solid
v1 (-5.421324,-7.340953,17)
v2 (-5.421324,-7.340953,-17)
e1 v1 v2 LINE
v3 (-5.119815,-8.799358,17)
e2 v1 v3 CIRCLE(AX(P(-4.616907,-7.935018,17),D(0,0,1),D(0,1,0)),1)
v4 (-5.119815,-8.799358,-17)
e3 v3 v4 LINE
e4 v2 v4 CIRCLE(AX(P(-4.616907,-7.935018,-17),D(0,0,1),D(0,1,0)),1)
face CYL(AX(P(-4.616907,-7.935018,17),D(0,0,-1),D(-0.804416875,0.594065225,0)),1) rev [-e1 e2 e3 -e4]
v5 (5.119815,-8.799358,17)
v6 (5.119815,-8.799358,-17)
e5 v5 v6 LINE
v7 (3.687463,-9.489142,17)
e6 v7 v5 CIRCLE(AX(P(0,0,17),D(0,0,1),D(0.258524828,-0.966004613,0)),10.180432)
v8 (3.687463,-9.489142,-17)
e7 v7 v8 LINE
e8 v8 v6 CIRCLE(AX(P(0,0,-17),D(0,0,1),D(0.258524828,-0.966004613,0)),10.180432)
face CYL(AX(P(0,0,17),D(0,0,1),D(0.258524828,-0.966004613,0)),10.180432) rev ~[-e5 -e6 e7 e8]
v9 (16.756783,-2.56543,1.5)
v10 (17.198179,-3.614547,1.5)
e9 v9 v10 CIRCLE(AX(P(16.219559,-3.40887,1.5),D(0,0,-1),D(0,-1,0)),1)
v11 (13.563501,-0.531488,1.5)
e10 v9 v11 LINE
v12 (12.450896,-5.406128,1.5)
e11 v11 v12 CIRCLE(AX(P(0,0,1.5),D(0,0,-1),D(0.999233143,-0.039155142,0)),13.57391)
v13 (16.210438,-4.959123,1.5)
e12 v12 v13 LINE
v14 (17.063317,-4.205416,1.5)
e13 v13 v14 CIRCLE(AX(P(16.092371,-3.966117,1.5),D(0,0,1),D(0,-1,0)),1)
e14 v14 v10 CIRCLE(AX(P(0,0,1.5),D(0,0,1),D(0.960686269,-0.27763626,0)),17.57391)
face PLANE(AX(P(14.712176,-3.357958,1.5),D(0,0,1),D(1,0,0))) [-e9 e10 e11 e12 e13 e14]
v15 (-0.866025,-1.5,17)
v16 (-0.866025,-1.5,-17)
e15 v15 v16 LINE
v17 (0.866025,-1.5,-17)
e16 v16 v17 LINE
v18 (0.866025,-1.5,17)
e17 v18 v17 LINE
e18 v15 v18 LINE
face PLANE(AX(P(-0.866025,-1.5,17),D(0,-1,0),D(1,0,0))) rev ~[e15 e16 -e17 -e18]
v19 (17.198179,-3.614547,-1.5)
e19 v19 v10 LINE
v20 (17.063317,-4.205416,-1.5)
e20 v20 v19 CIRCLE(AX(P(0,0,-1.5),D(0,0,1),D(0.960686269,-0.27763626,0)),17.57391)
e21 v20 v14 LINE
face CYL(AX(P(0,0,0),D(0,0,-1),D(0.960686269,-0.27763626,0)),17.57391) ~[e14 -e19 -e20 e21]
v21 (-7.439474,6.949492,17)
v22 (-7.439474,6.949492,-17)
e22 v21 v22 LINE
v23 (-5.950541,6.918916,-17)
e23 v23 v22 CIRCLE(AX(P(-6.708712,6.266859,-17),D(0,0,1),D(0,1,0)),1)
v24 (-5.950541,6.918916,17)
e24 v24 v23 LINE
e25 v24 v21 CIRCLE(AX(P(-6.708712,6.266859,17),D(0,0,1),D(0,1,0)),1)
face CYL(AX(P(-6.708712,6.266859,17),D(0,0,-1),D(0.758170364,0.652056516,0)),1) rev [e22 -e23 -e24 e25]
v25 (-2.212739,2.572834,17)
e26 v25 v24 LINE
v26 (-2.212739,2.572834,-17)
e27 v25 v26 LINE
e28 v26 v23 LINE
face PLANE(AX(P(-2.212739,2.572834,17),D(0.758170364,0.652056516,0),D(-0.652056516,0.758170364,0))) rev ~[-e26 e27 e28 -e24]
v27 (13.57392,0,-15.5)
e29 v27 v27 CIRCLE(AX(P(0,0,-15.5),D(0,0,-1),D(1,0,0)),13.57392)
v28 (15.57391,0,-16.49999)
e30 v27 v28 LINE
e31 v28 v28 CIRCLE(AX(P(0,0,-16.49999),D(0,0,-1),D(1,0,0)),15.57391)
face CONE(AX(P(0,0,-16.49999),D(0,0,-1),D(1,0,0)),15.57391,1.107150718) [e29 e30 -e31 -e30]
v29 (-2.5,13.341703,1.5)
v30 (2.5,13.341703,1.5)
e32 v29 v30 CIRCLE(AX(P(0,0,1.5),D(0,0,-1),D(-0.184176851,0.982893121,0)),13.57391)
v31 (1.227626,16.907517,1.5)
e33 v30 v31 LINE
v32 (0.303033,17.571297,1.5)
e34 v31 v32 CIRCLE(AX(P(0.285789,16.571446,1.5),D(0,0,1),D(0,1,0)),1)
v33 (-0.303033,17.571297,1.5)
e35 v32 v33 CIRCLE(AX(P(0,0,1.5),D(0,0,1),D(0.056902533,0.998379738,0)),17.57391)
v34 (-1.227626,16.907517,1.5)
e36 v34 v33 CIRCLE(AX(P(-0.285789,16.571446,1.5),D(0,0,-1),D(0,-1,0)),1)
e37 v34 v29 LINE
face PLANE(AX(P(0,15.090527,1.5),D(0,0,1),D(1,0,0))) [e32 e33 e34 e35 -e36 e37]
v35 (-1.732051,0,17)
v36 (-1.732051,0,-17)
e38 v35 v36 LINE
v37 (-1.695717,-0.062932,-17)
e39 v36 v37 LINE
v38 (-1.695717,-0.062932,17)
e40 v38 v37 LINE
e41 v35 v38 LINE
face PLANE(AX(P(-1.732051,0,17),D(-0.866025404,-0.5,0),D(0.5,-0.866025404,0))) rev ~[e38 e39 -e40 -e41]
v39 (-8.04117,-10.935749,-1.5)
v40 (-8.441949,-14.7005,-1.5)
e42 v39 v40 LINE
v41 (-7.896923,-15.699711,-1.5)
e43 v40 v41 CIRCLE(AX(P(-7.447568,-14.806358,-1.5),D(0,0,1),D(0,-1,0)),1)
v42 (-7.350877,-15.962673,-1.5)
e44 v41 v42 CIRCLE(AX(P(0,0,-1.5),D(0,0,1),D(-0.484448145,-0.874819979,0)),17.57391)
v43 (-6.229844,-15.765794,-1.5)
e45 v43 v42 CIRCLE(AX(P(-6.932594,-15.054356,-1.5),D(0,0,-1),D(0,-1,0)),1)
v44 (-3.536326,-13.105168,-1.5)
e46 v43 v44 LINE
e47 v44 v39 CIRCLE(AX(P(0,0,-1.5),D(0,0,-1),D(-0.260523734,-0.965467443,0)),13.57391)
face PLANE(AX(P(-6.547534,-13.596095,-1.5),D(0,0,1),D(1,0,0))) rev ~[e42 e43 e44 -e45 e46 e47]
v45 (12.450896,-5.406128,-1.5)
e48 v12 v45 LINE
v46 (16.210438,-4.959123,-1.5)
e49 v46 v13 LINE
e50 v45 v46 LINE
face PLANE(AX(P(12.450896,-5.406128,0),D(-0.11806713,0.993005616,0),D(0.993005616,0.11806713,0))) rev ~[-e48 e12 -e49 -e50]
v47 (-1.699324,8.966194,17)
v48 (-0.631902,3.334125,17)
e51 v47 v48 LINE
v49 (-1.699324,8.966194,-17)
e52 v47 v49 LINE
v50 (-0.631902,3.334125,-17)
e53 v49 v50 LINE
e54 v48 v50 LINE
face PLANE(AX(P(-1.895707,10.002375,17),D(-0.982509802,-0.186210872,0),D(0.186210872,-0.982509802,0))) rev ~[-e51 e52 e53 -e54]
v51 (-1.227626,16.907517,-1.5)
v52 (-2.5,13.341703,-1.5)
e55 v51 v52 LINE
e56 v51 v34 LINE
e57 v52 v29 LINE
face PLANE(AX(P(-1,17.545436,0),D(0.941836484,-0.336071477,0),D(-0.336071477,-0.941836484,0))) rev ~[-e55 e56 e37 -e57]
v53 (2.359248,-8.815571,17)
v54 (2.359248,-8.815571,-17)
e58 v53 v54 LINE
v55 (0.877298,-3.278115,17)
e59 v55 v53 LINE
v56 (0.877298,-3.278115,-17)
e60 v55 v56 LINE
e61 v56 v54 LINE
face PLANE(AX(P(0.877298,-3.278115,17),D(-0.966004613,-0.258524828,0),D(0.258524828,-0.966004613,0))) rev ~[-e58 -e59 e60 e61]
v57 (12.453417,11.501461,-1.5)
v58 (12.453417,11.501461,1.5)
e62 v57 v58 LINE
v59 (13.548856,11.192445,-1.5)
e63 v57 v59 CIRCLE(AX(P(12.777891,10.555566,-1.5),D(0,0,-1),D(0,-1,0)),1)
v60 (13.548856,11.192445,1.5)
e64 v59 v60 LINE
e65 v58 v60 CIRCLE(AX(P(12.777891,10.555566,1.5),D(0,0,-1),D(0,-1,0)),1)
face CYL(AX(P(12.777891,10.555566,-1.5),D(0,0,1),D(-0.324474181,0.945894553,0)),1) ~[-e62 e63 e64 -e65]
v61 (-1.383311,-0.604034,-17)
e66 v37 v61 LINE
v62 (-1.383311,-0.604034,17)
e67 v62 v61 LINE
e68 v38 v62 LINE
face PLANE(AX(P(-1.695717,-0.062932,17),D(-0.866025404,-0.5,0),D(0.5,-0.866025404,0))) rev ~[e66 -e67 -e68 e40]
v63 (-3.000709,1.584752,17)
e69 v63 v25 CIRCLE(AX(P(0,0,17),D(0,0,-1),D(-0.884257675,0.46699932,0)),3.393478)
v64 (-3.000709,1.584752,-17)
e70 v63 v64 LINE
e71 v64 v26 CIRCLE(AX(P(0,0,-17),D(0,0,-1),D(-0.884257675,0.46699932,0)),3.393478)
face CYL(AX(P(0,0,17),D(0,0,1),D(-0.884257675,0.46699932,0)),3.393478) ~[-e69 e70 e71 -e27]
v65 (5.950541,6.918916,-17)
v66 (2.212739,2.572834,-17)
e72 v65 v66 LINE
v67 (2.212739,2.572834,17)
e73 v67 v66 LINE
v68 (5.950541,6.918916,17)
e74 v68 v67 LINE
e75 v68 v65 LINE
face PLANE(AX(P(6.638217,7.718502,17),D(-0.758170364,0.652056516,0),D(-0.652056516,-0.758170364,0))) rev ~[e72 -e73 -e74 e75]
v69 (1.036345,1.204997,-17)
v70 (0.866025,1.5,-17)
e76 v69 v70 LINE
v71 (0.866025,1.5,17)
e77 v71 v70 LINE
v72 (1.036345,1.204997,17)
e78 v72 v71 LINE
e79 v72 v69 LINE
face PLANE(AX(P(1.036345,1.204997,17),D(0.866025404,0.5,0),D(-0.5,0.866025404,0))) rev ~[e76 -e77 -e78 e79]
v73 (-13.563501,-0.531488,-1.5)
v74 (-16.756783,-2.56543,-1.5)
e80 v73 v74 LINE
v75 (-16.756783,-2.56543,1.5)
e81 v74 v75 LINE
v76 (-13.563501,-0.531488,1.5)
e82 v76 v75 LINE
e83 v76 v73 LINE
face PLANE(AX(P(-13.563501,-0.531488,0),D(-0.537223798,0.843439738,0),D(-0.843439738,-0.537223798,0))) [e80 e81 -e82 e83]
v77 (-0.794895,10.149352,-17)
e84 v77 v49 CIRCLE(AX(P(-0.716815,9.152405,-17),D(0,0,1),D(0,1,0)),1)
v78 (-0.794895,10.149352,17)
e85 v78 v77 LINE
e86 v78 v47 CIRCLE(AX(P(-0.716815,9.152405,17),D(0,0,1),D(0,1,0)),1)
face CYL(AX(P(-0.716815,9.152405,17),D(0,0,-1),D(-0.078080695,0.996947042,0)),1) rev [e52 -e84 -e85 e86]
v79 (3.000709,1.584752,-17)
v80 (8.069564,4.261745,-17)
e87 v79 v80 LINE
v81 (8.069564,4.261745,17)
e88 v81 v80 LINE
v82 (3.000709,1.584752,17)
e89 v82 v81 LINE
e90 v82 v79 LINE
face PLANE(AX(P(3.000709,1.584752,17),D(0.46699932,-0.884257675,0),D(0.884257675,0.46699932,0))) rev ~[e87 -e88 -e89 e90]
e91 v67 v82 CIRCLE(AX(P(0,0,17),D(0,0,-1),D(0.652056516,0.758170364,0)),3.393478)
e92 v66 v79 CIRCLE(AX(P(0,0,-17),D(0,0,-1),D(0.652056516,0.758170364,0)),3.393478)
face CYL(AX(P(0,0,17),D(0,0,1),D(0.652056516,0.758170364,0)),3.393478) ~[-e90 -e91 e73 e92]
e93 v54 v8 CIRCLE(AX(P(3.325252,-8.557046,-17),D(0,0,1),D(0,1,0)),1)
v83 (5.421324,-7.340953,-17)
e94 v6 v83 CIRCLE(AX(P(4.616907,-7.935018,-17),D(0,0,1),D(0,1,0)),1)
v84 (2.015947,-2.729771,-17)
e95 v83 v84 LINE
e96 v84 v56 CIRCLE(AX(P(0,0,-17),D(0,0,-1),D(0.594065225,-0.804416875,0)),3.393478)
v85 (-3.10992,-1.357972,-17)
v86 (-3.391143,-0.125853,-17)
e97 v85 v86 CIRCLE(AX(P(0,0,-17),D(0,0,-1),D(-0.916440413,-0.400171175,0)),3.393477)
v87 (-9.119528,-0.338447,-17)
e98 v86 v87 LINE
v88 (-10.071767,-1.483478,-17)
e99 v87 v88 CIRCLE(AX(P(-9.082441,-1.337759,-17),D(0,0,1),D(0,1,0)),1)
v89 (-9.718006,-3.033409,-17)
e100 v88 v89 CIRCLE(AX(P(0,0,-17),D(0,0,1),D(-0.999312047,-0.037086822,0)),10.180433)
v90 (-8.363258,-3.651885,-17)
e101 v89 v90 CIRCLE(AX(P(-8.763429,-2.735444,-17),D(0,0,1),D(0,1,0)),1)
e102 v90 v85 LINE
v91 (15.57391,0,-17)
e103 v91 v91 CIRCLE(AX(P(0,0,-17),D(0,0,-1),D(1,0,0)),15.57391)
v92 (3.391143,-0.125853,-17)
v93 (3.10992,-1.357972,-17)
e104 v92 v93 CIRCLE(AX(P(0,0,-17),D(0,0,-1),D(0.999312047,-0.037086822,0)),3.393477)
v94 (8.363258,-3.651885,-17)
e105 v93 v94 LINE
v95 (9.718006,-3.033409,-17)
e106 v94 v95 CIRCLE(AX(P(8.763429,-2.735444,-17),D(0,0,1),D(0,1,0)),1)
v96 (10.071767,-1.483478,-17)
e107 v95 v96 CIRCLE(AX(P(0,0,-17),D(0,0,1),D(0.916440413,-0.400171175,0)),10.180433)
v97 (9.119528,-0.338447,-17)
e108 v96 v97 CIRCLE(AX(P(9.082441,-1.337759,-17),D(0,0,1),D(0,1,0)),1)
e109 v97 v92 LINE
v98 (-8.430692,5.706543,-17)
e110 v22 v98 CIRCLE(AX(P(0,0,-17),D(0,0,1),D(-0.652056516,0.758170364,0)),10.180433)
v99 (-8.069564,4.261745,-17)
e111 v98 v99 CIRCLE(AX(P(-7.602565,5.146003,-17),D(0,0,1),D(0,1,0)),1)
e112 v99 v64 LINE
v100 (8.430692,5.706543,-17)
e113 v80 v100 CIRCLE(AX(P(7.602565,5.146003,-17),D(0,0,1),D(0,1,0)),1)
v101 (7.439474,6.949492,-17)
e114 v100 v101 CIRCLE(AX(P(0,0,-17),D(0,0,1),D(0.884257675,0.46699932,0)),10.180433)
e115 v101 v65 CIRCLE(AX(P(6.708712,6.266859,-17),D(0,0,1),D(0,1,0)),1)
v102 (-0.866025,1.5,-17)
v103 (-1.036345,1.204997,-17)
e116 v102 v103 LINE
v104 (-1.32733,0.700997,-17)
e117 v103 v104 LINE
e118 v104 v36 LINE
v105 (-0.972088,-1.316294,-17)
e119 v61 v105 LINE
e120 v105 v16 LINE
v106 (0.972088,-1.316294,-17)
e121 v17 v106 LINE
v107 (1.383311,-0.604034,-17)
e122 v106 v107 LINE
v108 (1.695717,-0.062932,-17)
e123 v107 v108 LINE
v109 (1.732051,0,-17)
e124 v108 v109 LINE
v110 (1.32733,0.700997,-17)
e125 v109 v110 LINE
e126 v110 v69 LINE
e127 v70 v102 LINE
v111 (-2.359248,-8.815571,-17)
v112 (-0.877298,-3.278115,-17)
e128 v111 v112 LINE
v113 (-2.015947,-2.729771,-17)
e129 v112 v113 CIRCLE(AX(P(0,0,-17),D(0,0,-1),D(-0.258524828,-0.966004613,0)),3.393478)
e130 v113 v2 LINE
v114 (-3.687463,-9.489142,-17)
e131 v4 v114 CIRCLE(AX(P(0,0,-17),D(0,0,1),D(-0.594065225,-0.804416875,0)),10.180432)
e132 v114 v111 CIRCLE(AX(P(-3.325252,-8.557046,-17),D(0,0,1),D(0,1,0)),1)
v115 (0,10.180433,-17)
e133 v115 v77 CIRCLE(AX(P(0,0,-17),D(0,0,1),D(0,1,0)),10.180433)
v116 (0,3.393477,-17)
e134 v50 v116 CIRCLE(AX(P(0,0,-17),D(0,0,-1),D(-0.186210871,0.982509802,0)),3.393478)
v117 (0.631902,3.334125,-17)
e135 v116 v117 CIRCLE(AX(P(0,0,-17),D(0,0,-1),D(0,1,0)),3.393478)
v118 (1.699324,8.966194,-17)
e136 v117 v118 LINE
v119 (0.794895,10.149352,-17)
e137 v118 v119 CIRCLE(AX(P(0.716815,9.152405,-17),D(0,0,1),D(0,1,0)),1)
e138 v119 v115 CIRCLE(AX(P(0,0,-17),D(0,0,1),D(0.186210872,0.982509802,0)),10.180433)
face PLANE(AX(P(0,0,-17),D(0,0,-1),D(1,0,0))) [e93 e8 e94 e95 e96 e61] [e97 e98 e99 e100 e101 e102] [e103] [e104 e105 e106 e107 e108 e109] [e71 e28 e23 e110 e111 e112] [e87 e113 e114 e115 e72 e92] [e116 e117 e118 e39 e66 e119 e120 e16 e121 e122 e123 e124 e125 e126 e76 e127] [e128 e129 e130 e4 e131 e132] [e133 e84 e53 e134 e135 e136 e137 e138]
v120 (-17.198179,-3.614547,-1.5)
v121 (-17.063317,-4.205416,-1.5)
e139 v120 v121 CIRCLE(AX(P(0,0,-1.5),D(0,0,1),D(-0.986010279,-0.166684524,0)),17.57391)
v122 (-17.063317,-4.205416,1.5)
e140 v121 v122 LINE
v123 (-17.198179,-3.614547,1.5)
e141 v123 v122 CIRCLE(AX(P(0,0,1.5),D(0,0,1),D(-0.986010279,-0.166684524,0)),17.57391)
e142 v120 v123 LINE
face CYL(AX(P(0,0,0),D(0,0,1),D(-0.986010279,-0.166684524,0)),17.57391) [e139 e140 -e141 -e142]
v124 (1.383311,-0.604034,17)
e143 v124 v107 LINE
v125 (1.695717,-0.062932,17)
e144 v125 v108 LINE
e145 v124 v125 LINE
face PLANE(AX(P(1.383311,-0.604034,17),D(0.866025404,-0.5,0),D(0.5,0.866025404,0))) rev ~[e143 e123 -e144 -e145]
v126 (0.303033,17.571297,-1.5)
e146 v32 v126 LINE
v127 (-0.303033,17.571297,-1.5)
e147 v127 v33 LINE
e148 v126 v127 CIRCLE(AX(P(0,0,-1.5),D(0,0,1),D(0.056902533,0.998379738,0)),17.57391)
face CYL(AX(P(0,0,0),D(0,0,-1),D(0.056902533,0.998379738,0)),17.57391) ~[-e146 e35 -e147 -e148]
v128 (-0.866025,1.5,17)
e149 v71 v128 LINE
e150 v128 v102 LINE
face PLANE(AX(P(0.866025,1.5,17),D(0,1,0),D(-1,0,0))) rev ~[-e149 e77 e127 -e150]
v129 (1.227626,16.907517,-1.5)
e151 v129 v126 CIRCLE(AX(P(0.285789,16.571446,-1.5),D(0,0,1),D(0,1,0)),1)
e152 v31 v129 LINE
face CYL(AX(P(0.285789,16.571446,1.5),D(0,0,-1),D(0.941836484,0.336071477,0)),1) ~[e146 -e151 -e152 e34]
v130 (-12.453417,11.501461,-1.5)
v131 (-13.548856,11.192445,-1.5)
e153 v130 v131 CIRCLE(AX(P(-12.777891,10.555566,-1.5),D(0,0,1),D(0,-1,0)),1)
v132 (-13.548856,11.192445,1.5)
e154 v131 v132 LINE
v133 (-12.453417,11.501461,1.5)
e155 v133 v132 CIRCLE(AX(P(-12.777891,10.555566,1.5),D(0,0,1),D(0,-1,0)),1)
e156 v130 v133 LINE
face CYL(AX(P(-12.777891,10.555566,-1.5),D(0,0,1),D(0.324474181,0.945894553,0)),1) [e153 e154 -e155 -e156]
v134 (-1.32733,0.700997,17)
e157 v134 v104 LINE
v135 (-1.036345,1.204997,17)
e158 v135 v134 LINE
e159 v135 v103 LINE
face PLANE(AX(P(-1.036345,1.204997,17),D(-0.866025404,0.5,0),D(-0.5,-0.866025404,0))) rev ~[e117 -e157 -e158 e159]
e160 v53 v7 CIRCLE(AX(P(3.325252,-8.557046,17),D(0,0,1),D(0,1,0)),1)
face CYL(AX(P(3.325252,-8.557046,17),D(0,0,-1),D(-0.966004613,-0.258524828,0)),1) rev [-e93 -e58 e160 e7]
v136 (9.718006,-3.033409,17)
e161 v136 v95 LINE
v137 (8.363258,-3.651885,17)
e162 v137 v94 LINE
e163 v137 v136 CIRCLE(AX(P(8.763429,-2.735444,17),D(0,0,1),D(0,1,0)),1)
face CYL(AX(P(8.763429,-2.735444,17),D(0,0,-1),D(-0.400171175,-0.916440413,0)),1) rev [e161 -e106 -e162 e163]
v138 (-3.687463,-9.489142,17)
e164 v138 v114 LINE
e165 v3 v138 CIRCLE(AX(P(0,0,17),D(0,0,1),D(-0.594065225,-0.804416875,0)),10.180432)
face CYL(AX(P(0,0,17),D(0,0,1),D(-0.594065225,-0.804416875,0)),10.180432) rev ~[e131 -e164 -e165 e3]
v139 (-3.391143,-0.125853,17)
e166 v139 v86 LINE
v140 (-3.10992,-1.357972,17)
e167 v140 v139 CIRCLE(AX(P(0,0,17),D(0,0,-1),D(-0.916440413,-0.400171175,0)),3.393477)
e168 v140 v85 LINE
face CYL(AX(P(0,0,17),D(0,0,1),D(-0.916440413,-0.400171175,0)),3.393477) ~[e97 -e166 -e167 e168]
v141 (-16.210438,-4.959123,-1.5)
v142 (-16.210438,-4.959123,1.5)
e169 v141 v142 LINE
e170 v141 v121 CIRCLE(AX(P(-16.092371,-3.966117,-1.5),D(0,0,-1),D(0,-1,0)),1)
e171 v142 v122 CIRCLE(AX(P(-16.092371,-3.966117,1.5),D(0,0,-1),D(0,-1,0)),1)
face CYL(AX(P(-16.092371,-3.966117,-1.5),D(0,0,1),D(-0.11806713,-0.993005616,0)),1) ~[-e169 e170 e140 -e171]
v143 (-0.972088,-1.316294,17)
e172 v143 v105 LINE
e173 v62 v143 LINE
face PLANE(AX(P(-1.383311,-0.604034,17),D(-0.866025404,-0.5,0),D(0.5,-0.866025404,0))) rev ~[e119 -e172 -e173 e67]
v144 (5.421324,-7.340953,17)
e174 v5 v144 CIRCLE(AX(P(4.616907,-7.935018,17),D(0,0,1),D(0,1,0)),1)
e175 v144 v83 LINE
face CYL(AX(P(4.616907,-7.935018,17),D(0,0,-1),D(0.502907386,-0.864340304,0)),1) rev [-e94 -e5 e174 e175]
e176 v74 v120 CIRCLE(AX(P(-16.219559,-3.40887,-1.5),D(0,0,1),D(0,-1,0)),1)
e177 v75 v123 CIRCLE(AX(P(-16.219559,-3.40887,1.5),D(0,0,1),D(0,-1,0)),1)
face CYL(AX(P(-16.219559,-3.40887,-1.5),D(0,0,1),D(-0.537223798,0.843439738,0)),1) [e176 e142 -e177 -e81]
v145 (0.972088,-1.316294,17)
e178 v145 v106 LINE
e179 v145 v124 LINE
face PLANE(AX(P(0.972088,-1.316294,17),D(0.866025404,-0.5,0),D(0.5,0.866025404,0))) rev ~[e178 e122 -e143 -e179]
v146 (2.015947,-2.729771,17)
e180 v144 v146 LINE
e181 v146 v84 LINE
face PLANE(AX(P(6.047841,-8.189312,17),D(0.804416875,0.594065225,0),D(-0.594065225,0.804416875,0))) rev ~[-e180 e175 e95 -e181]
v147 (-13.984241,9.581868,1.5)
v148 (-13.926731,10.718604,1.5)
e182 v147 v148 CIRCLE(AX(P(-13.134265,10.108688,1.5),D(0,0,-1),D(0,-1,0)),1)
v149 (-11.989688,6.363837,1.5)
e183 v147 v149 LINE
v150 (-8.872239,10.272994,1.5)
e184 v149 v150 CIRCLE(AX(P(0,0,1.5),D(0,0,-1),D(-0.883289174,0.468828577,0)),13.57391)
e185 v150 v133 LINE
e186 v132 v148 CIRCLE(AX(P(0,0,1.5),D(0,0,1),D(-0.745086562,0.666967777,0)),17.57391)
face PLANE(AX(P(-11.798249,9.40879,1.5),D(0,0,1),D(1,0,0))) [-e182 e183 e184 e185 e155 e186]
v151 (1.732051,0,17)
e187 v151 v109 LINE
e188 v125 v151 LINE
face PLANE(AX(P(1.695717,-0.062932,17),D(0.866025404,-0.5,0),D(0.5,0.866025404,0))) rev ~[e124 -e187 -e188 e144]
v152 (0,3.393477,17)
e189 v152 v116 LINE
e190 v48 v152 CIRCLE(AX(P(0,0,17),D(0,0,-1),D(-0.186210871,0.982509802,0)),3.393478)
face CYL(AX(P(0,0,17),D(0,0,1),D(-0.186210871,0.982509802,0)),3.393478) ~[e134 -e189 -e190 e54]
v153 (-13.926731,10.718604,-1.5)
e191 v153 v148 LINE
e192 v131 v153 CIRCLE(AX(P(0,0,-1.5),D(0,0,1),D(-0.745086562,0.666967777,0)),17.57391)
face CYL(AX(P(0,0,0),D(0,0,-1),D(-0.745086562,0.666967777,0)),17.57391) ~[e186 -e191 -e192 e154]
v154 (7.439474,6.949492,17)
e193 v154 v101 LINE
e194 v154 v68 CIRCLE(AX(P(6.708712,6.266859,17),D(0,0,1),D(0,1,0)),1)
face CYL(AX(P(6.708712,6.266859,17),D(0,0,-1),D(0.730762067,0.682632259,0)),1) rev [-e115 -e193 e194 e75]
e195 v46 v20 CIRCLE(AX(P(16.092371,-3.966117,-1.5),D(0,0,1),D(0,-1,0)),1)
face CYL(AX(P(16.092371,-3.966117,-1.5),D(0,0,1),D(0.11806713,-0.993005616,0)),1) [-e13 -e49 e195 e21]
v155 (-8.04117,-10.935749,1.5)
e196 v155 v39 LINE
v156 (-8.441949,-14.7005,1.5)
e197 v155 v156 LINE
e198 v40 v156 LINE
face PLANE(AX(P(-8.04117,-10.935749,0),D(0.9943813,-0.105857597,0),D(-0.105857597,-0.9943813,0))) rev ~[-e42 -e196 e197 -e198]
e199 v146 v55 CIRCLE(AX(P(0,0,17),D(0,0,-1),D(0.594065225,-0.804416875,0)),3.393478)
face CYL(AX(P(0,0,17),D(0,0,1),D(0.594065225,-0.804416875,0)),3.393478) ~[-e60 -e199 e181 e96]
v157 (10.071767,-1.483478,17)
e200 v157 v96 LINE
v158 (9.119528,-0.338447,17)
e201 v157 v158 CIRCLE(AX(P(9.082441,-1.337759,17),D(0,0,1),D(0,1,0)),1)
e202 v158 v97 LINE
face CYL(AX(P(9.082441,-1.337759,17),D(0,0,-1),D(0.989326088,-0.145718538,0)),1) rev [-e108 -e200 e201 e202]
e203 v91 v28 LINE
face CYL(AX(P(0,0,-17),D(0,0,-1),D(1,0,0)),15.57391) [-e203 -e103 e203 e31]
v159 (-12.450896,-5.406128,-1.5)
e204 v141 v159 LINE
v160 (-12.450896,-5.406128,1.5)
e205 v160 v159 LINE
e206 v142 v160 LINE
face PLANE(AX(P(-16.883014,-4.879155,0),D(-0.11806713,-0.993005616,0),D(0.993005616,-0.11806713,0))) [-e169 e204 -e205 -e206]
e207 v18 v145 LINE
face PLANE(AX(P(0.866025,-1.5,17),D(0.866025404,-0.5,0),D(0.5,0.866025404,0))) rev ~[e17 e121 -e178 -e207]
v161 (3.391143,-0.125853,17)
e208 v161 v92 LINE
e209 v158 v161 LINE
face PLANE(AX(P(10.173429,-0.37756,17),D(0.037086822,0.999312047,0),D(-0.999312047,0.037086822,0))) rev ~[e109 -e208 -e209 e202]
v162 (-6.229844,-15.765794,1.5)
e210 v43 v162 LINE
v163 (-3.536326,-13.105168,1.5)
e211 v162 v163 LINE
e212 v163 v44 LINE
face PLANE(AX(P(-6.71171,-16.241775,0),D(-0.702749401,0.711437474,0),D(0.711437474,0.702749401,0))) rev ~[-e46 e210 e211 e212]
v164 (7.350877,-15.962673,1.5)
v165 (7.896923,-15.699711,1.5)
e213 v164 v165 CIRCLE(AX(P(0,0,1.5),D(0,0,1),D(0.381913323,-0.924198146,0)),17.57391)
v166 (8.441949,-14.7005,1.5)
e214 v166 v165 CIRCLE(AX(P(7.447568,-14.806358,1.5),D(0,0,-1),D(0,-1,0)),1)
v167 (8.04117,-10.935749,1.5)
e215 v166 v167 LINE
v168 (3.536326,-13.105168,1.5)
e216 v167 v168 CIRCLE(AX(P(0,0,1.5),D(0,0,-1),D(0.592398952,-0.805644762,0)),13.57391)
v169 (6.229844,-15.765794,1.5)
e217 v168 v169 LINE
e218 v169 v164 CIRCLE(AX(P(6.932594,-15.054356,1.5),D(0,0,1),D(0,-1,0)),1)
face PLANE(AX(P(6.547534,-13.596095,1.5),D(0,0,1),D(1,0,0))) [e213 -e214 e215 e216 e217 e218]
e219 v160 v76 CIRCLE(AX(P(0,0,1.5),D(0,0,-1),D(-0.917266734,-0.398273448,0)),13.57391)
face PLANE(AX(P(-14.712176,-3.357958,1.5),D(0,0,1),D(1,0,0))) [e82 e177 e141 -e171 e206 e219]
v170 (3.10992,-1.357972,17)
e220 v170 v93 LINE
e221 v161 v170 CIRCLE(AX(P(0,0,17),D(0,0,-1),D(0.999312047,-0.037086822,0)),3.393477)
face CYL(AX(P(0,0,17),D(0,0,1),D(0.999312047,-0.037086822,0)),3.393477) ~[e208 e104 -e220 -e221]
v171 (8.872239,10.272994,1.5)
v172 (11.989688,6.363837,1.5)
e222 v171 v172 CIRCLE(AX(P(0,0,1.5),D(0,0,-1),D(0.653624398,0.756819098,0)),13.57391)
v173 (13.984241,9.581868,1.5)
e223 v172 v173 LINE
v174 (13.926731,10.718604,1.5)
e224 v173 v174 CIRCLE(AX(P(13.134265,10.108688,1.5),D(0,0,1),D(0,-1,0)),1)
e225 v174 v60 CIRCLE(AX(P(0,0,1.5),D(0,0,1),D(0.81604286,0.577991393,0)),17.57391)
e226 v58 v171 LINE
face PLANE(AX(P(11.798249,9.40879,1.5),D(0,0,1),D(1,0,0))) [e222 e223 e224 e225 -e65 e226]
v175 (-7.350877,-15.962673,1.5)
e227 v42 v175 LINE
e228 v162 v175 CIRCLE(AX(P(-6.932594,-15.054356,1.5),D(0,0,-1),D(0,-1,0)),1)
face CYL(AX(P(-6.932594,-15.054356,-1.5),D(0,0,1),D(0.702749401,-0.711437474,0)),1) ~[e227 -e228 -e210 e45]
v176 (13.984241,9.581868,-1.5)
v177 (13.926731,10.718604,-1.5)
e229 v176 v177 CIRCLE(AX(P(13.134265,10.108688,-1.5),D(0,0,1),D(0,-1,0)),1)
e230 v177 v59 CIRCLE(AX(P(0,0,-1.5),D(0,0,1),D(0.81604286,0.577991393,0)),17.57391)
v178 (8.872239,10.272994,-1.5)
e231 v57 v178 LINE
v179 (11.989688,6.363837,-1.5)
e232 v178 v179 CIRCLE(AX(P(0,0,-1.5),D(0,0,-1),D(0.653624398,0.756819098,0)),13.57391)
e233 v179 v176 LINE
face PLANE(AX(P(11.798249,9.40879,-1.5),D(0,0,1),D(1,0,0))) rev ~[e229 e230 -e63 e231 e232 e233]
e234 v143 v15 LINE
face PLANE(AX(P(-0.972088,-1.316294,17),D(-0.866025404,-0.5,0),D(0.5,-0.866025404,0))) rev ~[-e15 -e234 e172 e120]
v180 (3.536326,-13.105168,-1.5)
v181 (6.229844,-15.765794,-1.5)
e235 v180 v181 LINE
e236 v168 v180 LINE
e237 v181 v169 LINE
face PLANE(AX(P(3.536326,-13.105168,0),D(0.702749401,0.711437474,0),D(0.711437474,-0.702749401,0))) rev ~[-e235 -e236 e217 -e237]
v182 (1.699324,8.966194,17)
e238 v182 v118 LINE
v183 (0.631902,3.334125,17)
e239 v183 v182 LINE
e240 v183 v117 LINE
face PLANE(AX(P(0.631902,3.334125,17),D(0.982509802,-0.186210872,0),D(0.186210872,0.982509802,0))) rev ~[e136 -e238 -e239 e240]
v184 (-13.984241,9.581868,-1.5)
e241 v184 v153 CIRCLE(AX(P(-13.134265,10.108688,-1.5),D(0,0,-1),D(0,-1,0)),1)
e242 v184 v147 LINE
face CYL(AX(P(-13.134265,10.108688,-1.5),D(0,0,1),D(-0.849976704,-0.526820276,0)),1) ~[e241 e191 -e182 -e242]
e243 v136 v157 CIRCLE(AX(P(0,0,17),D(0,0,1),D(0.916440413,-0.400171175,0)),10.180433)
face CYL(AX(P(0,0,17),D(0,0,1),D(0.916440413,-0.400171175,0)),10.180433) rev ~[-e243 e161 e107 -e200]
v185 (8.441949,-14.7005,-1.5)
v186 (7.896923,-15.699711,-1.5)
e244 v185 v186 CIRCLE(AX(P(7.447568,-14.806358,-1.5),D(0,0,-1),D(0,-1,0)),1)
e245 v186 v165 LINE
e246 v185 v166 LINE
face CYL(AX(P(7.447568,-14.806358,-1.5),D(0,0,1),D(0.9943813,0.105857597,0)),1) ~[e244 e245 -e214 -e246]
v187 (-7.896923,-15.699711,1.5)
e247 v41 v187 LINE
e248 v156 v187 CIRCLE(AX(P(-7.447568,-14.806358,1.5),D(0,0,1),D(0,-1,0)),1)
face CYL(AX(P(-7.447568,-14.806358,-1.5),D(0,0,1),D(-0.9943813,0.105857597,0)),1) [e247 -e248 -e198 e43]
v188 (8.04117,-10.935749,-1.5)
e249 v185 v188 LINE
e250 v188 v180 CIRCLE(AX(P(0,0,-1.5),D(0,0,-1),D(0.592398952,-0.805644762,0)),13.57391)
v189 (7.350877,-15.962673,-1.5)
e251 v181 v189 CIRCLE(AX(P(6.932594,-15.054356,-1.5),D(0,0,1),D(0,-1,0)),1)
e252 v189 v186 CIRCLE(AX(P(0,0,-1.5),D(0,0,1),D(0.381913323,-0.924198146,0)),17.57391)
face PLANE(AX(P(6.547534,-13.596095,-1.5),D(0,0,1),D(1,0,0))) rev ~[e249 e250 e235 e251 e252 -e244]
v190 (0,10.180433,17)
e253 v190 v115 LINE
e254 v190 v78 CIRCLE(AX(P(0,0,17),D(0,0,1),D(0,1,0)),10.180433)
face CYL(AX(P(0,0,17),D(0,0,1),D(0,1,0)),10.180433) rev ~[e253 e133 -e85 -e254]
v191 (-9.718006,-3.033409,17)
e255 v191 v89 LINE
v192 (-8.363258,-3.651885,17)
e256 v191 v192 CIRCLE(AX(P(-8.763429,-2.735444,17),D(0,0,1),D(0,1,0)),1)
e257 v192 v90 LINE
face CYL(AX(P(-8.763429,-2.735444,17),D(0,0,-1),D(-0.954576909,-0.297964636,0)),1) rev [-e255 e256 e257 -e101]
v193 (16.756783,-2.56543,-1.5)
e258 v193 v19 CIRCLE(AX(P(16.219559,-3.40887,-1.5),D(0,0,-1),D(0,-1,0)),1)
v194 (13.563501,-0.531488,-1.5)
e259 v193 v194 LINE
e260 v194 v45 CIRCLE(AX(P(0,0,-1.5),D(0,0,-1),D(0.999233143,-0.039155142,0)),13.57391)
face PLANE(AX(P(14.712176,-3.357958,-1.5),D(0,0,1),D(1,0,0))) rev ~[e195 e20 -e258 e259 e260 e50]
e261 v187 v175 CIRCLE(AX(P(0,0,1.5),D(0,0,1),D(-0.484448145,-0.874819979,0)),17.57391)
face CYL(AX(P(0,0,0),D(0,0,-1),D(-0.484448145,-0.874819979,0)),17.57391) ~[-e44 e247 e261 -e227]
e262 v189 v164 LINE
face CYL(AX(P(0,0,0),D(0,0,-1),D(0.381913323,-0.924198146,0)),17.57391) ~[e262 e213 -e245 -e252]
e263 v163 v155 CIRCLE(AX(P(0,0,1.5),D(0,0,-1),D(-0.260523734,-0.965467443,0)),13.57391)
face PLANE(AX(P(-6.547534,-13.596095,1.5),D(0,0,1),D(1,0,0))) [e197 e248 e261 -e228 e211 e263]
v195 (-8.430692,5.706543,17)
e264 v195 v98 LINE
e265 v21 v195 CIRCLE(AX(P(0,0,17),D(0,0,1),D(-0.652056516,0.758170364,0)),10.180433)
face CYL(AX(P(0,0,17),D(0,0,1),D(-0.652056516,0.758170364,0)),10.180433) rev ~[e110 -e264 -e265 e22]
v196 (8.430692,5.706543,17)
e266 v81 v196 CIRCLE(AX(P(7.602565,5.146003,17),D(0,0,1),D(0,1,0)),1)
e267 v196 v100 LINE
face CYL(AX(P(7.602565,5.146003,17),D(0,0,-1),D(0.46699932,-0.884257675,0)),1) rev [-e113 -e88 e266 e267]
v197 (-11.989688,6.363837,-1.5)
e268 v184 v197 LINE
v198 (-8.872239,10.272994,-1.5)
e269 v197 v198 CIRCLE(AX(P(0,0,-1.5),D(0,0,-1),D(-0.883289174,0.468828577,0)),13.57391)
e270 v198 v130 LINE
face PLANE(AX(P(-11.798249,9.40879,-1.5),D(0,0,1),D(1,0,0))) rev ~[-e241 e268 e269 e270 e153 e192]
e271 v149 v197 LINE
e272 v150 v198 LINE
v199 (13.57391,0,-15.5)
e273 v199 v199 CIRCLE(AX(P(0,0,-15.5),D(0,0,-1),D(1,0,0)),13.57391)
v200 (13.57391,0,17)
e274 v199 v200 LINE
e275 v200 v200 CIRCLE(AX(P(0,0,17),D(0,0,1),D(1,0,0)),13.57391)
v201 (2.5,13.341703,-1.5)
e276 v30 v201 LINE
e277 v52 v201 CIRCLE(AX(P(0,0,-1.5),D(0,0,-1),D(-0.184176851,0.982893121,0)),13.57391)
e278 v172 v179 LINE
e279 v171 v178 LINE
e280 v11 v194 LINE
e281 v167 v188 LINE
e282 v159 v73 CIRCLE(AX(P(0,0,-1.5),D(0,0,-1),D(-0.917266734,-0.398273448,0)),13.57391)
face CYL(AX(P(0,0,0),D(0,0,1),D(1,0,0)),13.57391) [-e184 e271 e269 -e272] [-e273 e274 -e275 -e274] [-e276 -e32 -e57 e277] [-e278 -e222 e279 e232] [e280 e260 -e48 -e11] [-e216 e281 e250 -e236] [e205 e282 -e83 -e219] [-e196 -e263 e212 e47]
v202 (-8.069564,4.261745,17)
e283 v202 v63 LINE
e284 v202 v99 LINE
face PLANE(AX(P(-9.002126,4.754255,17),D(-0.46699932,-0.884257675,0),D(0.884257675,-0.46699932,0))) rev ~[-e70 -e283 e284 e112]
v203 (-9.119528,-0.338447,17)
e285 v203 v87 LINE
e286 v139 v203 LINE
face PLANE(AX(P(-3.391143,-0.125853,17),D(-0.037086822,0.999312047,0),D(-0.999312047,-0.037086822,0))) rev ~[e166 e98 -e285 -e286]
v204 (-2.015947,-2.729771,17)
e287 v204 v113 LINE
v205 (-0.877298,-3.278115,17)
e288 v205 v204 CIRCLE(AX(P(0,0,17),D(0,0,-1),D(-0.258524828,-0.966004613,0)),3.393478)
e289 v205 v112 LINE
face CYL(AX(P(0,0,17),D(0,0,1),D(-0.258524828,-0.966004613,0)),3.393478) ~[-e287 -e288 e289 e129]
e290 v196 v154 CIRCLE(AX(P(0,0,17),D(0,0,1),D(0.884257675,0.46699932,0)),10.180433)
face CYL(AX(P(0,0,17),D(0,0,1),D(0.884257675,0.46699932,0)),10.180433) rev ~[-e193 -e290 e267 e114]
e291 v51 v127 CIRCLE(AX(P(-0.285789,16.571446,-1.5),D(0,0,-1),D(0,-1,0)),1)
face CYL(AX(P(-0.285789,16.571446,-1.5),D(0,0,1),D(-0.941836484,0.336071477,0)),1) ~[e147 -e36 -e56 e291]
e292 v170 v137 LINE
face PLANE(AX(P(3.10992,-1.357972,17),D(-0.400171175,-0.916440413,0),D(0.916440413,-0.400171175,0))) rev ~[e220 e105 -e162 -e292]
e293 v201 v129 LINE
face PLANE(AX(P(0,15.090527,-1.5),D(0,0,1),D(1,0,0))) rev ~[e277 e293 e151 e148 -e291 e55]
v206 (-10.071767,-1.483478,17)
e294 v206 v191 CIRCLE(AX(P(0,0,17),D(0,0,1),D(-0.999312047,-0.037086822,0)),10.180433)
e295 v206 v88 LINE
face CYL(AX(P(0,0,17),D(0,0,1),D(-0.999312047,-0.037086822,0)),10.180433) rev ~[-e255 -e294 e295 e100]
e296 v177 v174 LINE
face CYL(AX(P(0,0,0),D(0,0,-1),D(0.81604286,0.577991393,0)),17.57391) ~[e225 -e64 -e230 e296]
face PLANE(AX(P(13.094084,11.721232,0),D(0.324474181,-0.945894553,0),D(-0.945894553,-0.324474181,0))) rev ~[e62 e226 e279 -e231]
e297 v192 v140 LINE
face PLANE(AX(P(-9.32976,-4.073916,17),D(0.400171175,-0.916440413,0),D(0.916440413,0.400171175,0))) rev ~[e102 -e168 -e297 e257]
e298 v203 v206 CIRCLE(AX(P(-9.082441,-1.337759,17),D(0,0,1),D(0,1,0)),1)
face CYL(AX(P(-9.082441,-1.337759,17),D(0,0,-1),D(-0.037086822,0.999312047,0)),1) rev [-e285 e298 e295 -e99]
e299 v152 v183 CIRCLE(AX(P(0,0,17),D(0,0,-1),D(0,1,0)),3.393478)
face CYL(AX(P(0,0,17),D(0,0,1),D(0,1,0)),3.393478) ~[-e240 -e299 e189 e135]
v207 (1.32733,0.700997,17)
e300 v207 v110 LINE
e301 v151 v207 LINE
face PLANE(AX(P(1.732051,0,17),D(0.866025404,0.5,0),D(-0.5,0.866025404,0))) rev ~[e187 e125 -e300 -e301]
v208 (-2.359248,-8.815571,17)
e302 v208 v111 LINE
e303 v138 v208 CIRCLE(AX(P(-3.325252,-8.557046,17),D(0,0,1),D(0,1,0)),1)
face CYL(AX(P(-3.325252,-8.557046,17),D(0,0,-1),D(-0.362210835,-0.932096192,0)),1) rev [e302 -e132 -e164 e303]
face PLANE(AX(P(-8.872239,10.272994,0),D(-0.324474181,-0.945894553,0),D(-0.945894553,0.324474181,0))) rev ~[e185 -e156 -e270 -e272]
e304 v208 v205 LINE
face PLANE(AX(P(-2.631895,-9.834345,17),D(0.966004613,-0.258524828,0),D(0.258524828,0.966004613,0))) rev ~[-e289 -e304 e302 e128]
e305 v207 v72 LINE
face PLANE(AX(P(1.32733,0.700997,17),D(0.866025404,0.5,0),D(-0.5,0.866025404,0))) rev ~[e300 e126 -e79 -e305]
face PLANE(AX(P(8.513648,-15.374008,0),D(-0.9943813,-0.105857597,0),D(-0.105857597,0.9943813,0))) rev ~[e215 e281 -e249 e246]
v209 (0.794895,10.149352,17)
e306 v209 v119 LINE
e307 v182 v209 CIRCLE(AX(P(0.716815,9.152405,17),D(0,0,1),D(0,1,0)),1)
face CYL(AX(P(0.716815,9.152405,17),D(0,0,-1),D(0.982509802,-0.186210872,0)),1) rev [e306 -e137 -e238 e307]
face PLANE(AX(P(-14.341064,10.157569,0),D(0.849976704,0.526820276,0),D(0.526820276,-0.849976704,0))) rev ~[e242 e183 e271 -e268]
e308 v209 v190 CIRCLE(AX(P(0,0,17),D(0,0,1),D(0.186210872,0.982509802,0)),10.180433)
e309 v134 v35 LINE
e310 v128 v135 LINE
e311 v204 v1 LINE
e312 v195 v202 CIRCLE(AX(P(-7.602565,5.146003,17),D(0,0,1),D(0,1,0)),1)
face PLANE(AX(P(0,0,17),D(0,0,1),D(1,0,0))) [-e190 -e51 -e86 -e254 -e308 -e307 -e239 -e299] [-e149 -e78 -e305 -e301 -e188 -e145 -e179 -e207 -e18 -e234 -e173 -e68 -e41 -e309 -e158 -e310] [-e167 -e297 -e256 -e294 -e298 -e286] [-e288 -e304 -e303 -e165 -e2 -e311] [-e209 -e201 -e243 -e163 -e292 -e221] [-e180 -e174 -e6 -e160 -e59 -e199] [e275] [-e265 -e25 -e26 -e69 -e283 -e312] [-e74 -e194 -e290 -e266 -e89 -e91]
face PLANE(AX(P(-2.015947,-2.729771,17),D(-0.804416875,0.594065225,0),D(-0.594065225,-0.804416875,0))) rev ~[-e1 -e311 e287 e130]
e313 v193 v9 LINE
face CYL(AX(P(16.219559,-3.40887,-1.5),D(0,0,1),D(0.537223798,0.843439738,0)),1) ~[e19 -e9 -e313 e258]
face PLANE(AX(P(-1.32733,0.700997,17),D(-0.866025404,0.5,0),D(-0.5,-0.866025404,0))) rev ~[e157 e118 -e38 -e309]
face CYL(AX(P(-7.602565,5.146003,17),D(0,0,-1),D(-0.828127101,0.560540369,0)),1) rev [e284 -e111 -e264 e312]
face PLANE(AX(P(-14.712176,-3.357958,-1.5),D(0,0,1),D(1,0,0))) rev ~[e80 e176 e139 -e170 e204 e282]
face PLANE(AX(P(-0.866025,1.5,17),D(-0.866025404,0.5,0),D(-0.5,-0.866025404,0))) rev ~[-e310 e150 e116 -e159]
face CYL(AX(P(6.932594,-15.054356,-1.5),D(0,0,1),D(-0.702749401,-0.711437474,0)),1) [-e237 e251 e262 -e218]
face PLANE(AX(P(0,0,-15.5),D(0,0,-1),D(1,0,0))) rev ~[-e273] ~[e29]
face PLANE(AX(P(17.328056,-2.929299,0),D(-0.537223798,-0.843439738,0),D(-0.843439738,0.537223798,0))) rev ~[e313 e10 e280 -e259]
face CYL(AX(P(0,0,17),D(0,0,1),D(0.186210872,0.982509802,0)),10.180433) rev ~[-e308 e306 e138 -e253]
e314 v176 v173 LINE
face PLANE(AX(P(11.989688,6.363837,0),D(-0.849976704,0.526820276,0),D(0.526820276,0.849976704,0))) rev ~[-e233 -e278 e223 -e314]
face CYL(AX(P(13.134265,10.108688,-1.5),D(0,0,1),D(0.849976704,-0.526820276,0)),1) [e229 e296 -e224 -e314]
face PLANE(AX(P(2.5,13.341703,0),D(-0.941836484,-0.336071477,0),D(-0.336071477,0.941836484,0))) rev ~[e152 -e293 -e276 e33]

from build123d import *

# Parameters (mm, degrees)
F0_R     = 13.57391
F1_DEPTH = 17
F3_DEPTH = 1.5
F5_DEPTH = 34
F6_R     = 1
F7_R     = 15.57391
F7_R_2   = 13.57391
F8_DEPTH = 1.5
F9_SIZE2 = 0.99999
F9_SIZE  = 1.99999
F10_R    = 1


# Not quite as in the source:
# - a fillet or chamfer is up to 0.001 mm smaller than in the source, because OpenCascade refuses the exact size
# - a feature names something its author has since deleted; it is built from what else it names


with BuildPart() as f1:
    # F0 (on Top) → F1 (new body, symmetric)
    with BuildSketch(Plane.XY):
        Circle(F0_R)
    extrude(amount=F1_DEPTH, both=True)

    # F2 (on Top) → F3 (join, symmetric)
    with BuildSketch(Plane.XY):
        with BuildLine():
            Line((-8.8722387473, 10.27299432), (-13.094084175, 11.721231689))
            ThreePointArc((-13.094084175, 11.721231689), (-13.7398361081, 10.9571536638), (-14.3410637787, 10.1575687241))
            Line((-14.3410637787, 10.1575687241), (-11.9896877566, 6.3638369077))
            ThreePointArc((-11.9896877566, 6.3638369077), (-10.6125101782, 8.4631944563), (-8.8722387473, 10.27299432))
        make_face()
        with BuildLine():
            ThreePointArc((1, 17.5454356654), (0, 17.57391), (-1, 17.5454356654))
            Line((-1, 17.5454356654), (-2.5, 13.3417027657))
            ThreePointArc((-2.5, 13.3417027657), (0, 13.57391), (2.5, 13.3417027657))
            Line((2.5, 13.3417027657), (1, 17.5454356654))
        make_face()
        with BuildLine():
            Line((11.9896877566, 6.3638369077), (14.3410637787, 10.1575687241))
            ThreePointArc((14.3410637787, 10.1575687241), (13.7398361081, 10.9571536638), (13.094084175, 11.721231689))
            Line((13.094084175, 11.721231689), (8.8722387473, 10.27299432))
            ThreePointArc((8.8722387473, 10.27299432), (10.6125101782, 8.4631944563), (11.9896877566, 6.3638369077))
        make_face()
        with BuildLine():
            Line((12.4508960874, -5.4061279404), (16.8830140276, -4.8791546431))
            ThreePointArc((16.8830140276, -4.8791546431), (17.1332953852, -3.9105628665), (17.3280558955, -2.9292988187))
            Line((17.3280558955, -2.9292988187), (13.5635007572, -0.5314883795))
            ThreePointArc((13.5635007572, -0.5314883795), (13.2335837364, -3.0204791306), (12.4508960874, -5.4061279404))
        make_face()
        with BuildLine():
            Line((3.5363257124, -13.1051681845), (6.711710363, -16.2417750474))
            ThreePointArc((6.711710363, -16.2417750474), (7.6250337817, -15.8335457973), (8.5136480988, -15.3740075692))
            Line((8.5136480988, -15.3740075692), (8.0411700519, -10.9357494889))
            ThreePointArc((8.0411700519, -10.9357494889), (5.8894988252, -12.2296703257), (3.5363257124, -13.1051681845))
        make_face()
        with BuildLine():
            Line((-8.0411700519, -10.9357494889), (-8.5136480988, -15.3740075692))
            ThreePointArc((-8.5136480988, -15.3740075692), (-7.6250337817, -15.8335457973), (-6.711710363, -16.2417750474))
            Line((-6.711710363, -16.2417750474), (-3.5363257124, -13.1051681845))
            ThreePointArc((-3.5363257124, -13.1051681845), (-5.8894988252, -12.2296703257), (-8.0411700519, -10.9357494889))
        make_face()
        with BuildLine():
            Line((-13.5635007572, -0.5314883795), (-17.3280558955, -2.9292988187))
            ThreePointArc((-17.3280558955, -2.9292988187), (-17.1332953852, -3.9105628665), (-16.8830140276, -4.8791546431))
            Line((-16.8830140276, -4.8791546431), (-12.4508960874, -5.4061279404))
            ThreePointArc((-12.4508960874, -5.4061279404), (-13.2335837364, -3.0204791306), (-13.5635007572, -0.5314883795))
        make_face()
    extrude(amount=F3_DEPTH, both=True)

    # F4 (on face) → F5 (cut)
    with BuildSketch(Plane.XY.offset(17)):
        with BuildLine():
            ThreePointArc((-3.0007085232, 1.5847516846), (-2.6531275445, 2.1157986141), (-2.2127391143, 2.5728340707))
            Line((-2.2127391143, 2.5728340707), (-6.6382173429, 7.718502212))
            ThreePointArc((-6.6382173429, 7.718502212), (-7.9593826336, 6.3473958423), (-9.0021255696, 4.7542550537))
            Line((-9.0021255696, 4.7542550537), (-3.0007085232, 1.5847516846))
        make_face()
        with BuildLine():
            ThreePointArc((-0.6319024037, 3.334124907), (-0.3173418417, 3.3786067688), (0, 3.3934775))
            Line((0, 3.3934775), (0, 6.786955))
            Line((0, 6.786955), (0, 10.1804325))
            ThreePointArc((0, 10.1804325), (-0.9520255252, 10.1358203065), (-1.895707211, 10.0023747209))
            Line((-1.895707211, 10.0023747209), (-0.6319024037, 3.334124907))
        make_face()
        with BuildLine():
            Line((0, 6.786955), (0, 3.3934775))
            ThreePointArc((0, 3.3934775), (0.3173418417, 3.3786067688), (0.6319024037, 3.334124907))
            Line((0.6319024037, 3.334124907), (1.895707211, 10.0023747209))
            ThreePointArc((1.895707211, 10.0023747209), (0.9520255252, 10.1358203065), (0, 10.1804325))
            Line((0, 10.1804325), (0, 6.786955))
        make_face()
        with BuildLine():
            ThreePointArc((2.2127391143, 2.5728340707), (2.6531275445, 2.1157986141), (3.0007085232, 1.5847516846))
            Line((3.0007085232, 1.5847516846), (9.0021255696, 4.7542550537))
            ThreePointArc((9.0021255696, 4.7542550537), (7.9593826336, 6.3473958423), (6.6382173429, 7.718502212))
            Line((6.6382173429, 7.718502212), (2.2127391143, 2.5728340707))
        make_face()
        with BuildLine():
            ThreePointArc((3.3911429475, -0.1258532971), (3.3083959341, -0.7551197827), (3.1099199215, -1.3579718793))
            Line((3.1099199215, -1.3579718793), (9.3297597644, -4.073915638))
            ThreePointArc((9.3297597644, -4.073915638), (9.9251878023, -2.265359348), (10.1734288426, -0.3775598913))
            Line((10.1734288426, -0.3775598913), (3.3911429475, -0.1258532971))
        make_face()
        with BuildLine():
            ThreePointArc((2.0159469746, -2.7297705652), (1.4723747063, -3.0574175814), (0.8772981881, -3.2781149205))
            Line((0.8772981881, -3.2781149205), (2.6318945642, -9.8343447616))
            ThreePointArc((2.6318945642, -9.8343447616), (4.4171241189, -9.1722527443), (6.0478409237, -8.1893116956))
            Line((6.0478409237, -8.1893116956), (2.0159469746, -2.7297705652))
        make_face()
        with BuildLine():
            ThreePointArc((-0.8772981881, -3.2781149205), (-1.4723747063, -3.0574175814), (-2.0159469746, -2.7297705652))
            Line((-2.0159469746, -2.7297705652), (-6.0478409237, -8.1893116956))
            ThreePointArc((-6.0478409237, -8.1893116956), (-4.4171241189, -9.1722527443), (-2.6318945642, -9.8343447616))
            Line((-2.6318945642, -9.8343447616), (-0.8772981881, -3.2781149205))
        make_face()
        with BuildLine():
            ThreePointArc((-3.1099199215, -1.3579718793), (-3.3083959341, -0.7551197827), (-3.3911429475, -0.1258532971))
            Line((-3.3911429475, -0.1258532971), (-10.1734288426, -0.3775598913))
            ThreePointArc((-10.1734288426, -0.3775598913), (-9.9251878023, -2.265359348), (-9.3297597644, -4.073915638))
            Line((-9.3297597644, -4.073915638), (-3.1099199215, -1.3579718793))
        make_face()
        Polygon((1.3273298856, 0.7009971998), (0, 0), (1.6957169725, -0.0629320484), (1.7320508076, 0), align=None)
        Polygon((1.6957169725, -0.0629320484), (0, 0), (1.3833114811, -0.6040342321), align=None)
        Polygon((1.3833114811, -0.6040342321), (0, 0), (0.9720883359, -1.3162936127), align=None)
        Polygon((0.9720883359, -1.3162936127), (0, 0), (0.4014341516, -1.5), (0.8660254038, -1.5), align=None)
        Polygon((0.4014341516, -1.5), (0, 0), (-0.4014341516, -1.5), align=None)
        Polygon((-0.4014341516, -1.5), (0, 0), (-0.9720883359, -1.3162936127), (-0.8660254038, -1.5), align=None)
        Polygon((-0.9720883359, -1.3162936127), (0, 0), (-1.3833114811, -0.6040342321), align=None)
        Polygon((-1.3833114811, -0.6040342321), (0, 0), (-1.6957169725, -0.0629320484), align=None)
        Polygon((-1.6957169725, -0.0629320484), (0, 0), (-1.3273298856, 0.7009971998), (-1.7320508076, 0), align=None)
        Polygon((-1.3273298856, 0.7009971998), (0, 0), (-1.0363453205, 1.2049972508), align=None)
        Polygon((-1.0363453205, 1.2049972508), (0, 0), (-0.2842885711, 1.5), (-0.8660254038, 1.5), align=None)
        Polygon((-0.2842885711, 1.5), (0, 0), (0, 1.5), align=None)
        Polygon((0, 1.5), (0, 0), (0.2842885711, 1.5), align=None)
        Polygon((0.2842885711, 1.5), (0, 0), (1.0363453205, 1.2049972508), (0.8660254038, 1.5), align=None)
        Polygon((1.0363453205, 1.2049972508), (0, 0), (1.3273298856, 0.7009971998), align=None)
    extrude(amount=-F5_DEPTH, mode=Mode.SUBTRACT)

    # F6
    f6_edges = [f1.edges().sort_by_distance(p)[0] for p in [
        (-6.047841, -8.189312, 0),
        (-2.631895, -9.834345, 0),
        (2.631895, -9.834345, 0),
        (6.047841, -8.189312, 0),
        (9.32976, -4.073916, 0),
        (-9.32976, -4.073916, 0),
        (-10.173429, -0.37756, 0),
        (-9.002126, 4.754255, 0),
        (-6.638217, 7.718502, 0),
        (6.638217, 7.718502, 0),
        (-1.895707, 10.002375, 0),
        (1.895707, 10.002375, 0),
        (9.002126, 4.754255, 0),
        (10.173429, -0.37756, 0),
    ]]
    fillet(f6_edges, radius=F6_R)

    # F7 (on face) → F8 (join)
    with BuildSketch(Plane(origin=(0, 0, -17), x_dir=(1, 0, 0), z_dir=(0, 0, -1))):
        Circle(F7_R)
        Circle(F7_R_2, mode=Mode.SUBTRACT)
    extrude(amount=-F8_DEPTH)

    # F9 (size 2 and 1 in the source; OpenCascade refuses exactly that, so slightly less here)
    f9_edges = [f1.edges().sort_by_distance(p)[0] for p in [
        (-15.57391, 0, -15.5),
    ]]
    f9_side = f1.faces().sort_by_distance((-15.133413, 0, -15.5))[0]
    chamfer(f9_edges, length=F9_SIZE, length2=F9_SIZE2, reference=f9_side)

    # F10
    f10_edges = [f1.edges().sort_by_distance(p)[0] for p in [
        (14.341064, 10.157569, 0),
        (13.094084, 11.721232, 0),
        (1, 17.545436, 0),
        (-1, 17.545436, 0),
        (-13.094084, 11.721232, 0),
        (-14.341064, 10.157569, 0),
        (-17.328056, -2.929299, 0),
        (-16.883014, -4.879155, 0),
        (-8.513648, -15.374008, 0),
        (-6.71171, -16.241775, 0),
        (6.71171, -16.241775, 0),
        (8.513648, -15.374008, 0),
        (16.883014, -4.879155, 0),
        (17.328056, -2.929299, 0),
    ]]
    fillet(f10_edges, radius=F10_R)


solid = f1.part
